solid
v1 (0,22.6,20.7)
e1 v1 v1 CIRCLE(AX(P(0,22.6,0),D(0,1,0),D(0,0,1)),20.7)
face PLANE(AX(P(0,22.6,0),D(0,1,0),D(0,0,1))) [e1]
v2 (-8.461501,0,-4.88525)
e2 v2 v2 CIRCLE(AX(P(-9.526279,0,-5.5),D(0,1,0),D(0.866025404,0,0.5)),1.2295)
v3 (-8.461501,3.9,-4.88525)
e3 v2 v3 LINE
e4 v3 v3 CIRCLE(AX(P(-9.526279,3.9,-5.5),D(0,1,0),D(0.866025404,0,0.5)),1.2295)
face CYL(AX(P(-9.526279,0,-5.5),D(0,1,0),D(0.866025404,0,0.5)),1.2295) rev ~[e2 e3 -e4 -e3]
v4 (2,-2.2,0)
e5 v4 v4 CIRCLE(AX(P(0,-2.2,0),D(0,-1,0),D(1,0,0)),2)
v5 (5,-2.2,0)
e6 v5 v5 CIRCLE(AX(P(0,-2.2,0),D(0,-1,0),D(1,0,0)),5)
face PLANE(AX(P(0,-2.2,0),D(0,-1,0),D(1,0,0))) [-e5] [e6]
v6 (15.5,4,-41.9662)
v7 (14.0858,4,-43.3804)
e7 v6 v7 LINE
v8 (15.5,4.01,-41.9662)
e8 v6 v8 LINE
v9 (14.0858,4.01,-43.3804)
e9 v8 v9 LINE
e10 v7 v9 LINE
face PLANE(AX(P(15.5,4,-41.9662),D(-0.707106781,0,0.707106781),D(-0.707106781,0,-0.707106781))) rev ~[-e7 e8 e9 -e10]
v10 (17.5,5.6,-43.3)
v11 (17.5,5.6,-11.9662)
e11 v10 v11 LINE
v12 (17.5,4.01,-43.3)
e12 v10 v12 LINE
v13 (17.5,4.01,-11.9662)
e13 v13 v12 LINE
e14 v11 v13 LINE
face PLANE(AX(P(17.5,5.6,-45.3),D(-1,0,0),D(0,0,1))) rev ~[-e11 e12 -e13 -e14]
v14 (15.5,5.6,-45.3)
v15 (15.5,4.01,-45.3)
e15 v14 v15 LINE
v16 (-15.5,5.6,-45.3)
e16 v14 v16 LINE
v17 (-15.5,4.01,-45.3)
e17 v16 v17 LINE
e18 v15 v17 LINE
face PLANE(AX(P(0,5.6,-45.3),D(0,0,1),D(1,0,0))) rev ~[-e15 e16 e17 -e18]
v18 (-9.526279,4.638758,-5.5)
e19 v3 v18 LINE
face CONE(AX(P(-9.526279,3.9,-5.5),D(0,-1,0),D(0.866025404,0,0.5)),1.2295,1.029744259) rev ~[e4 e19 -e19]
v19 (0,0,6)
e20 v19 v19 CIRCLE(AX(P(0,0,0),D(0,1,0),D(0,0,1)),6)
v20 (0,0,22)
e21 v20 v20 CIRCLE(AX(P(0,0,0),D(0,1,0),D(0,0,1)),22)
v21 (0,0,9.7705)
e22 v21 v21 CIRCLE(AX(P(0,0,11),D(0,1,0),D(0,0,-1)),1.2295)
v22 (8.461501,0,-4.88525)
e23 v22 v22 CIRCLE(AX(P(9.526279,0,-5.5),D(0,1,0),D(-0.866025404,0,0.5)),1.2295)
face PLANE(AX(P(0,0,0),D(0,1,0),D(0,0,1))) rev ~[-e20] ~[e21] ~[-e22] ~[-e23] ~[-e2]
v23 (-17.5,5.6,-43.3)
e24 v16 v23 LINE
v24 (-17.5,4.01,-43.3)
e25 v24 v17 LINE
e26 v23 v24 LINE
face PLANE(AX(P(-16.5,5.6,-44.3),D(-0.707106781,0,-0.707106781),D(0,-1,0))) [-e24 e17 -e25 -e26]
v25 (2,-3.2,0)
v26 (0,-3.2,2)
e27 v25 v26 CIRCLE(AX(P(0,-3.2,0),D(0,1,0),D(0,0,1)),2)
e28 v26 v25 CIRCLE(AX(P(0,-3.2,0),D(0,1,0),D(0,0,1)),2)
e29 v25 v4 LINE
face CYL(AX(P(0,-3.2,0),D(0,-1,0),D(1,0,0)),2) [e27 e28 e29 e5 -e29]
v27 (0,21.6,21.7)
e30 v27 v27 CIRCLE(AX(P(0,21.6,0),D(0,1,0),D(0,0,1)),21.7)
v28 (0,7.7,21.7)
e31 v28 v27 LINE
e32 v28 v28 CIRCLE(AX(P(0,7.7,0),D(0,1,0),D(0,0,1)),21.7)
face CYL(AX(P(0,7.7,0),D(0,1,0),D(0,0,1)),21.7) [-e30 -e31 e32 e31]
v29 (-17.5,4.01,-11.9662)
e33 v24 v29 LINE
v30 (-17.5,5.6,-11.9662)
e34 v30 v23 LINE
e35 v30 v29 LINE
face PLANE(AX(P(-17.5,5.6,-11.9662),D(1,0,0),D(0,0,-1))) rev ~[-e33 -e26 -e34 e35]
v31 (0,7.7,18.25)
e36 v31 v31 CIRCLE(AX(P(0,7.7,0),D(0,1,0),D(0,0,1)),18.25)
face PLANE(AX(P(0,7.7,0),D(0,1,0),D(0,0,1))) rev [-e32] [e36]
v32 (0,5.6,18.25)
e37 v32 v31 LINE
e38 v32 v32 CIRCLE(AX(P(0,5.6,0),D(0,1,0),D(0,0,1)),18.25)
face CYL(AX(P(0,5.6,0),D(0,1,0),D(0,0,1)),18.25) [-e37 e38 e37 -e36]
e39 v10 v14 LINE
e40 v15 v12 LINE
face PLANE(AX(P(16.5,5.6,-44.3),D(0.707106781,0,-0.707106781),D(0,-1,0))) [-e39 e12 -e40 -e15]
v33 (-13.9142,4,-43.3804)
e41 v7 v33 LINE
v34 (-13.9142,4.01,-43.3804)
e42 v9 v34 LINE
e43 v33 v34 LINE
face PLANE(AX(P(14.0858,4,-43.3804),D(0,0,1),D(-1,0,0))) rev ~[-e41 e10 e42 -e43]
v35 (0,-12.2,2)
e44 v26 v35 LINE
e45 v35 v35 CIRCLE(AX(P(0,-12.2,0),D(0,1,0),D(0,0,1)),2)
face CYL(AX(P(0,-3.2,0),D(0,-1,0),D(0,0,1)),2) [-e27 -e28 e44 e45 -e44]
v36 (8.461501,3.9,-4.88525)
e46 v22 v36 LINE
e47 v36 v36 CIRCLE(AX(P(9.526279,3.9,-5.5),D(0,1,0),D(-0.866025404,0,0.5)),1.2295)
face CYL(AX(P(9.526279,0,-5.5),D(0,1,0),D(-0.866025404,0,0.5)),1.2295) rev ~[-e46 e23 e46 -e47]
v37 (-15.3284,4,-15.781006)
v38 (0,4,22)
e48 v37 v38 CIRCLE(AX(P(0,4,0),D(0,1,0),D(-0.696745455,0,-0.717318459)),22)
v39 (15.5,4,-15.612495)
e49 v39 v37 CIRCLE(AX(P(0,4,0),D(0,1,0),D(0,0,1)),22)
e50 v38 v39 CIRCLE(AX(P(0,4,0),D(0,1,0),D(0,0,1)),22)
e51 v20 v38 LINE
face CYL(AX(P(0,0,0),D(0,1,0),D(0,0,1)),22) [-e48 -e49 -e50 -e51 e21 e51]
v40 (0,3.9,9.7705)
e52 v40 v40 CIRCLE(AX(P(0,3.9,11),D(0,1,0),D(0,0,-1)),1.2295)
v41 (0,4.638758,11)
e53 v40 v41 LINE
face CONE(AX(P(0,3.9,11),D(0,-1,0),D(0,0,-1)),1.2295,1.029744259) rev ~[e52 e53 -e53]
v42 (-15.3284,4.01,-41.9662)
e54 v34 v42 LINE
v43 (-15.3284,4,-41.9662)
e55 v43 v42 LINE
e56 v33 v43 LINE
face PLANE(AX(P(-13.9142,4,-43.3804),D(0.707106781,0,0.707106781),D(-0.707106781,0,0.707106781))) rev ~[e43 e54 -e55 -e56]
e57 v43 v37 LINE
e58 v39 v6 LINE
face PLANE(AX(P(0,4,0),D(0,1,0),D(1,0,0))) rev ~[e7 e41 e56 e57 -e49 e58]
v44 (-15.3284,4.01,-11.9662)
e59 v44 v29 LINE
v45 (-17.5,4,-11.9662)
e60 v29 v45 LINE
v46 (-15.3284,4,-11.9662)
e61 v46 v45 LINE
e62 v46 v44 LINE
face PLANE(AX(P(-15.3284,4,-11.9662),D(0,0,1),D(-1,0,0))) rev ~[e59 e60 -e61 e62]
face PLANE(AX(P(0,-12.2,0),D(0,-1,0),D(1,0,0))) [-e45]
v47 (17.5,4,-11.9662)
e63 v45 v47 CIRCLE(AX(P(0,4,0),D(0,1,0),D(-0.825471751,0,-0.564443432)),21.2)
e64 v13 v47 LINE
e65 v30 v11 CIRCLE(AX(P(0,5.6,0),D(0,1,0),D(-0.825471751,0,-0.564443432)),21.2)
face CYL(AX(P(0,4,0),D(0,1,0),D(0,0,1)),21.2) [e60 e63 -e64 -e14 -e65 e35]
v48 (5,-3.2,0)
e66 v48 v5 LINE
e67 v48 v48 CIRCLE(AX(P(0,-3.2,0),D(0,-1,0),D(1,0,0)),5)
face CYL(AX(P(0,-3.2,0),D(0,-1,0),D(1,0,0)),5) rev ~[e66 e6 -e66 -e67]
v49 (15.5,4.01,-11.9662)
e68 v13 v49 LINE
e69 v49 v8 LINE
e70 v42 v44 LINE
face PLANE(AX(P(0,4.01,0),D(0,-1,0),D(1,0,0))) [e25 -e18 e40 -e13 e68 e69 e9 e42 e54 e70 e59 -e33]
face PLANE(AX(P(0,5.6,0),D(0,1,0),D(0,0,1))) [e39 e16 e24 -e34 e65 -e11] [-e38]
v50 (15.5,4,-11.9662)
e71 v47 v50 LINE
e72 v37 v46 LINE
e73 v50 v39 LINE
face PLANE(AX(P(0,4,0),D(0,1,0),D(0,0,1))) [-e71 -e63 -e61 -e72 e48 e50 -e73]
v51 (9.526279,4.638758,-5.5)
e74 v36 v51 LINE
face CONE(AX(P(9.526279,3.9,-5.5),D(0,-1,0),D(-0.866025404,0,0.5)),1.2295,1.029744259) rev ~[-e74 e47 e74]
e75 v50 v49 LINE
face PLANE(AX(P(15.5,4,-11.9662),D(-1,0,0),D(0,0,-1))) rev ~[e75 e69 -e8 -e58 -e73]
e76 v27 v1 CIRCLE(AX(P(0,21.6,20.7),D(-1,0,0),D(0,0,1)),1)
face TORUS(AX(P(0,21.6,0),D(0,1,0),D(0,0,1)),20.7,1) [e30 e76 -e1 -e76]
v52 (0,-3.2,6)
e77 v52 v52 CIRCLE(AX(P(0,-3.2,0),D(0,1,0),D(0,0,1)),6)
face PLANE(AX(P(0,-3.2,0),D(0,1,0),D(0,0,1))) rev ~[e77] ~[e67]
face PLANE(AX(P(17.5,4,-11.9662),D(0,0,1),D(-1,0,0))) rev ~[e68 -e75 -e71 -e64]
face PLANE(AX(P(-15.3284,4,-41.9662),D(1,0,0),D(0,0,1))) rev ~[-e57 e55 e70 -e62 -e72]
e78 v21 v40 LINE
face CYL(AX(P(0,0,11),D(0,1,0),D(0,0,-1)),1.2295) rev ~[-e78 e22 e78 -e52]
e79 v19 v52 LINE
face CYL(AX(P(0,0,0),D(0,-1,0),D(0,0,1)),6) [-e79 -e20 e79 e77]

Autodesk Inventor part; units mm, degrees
ref_plane "YZ Plane" through (0, 0, 0) normal (1, 0, 0) x (0, 1, 0)
ref_plane "XZ Plane" through (0, 0, 0) normal (0, 1, 0) x (-1, 0, 0)
ref_plane "XY Plane" through (0, 0, 0) normal (0, 0, 1) x (1, 0, 0)
sketch "Skizze1" plane through (0, 0, 0) normal (1, 0, 0) x (0, 1, 0)
  line L0 (0, 26.4) -> (0, -4.4) projected
  line L1 (0, 6) -> (0, 22)
  line L2 (0, 22) -> (4, 22)
  line L3 (4, 22) -> (4, 21.2)
  line L4 (4, 21.2) -> (5.6, 21.2)
  line L5 (5.6, 21.2) -> (5.6, 18.25)
  line L6 (5.6, 18.25) -> (7.7, 18.25)
  line L7 (7.7, 18.25) -> (7.7, 21.7)
  line L8 (7.7, 21.7) -> (22.6, 21.7)
  line L9 (22.6, 21.7) -> (22.6, 0)
  line L10 (-20.2, 0) -> (22.6, 0) construction
  line L11 (0, 6) -> (-3.2, 6)
  line L12 (-3.2, 6) -> (-3.2, 2)
  line L13 (-3.2, 2) -> (-20.2, 2)
  line L14 (-20.2, 2) -> (-20.2, 0)
  line L15 (-28.76, 0) -> (31.16, 0) projected
  line L16 (-20.2, 0) -> (22.6, 0)
  point P0 (0, 0)
  dimension "d0" = 44
  dimension "d1" = 4
  dimension "d2" = 1.6
  dimension "d3" = 2.1
  dimension "d4" = 22.6
  dimension "d5" = 43.4
  dimension "d6" = 12
  dimension "d7" = 4
  dimension "d8" = 3.2
  dimension "d9" = 20.2
  dimension "d10" = 42.4
  dimension "d11" = 36.5
revolve "Umdrehung1" add sketch "Skizze1" angle 360 about axis through (0, -20.2, 0) along (0, 1, 0)
fillet "Rundung1" radius 1 1 edges at (0, 22.6, -21.7)
sketch "Skizze2" plane through (0, -3.2, 0) normal (0, -1, 0) x (1, 0, 0)
  circle A0 centre (0, 0) radius 6 projected
  circle A1 centre (0, 0) radius 5
  circle A2 centre (0, 0) radius 2
  dimension "d14" = 1
extrude "Extrusion1" cut sketch "Skizze2" against normal blind 1 contours A1
sketch "Skizze3" plane through (0, 0, 0) normal (0, -1, 0) x (1, 0, 0)
  line L0 (0, 30.8) -> (0, -30.8) projected
  line L1 (-30.8, 0) -> (30.8, 0) projected
  point P0 (0, 0)
  point P1 (0, 11)
  dimension "d17" = 11
hole "Bohrung1" at (0, 0, 11) direction (0, 1, 0) diameter 2.459 depth 3.9 tip angle 118 thread size "M3x0.5" class "6H" standard "ANSI Metric M Profile"
pattern_circular "Runde Anordnung1" count 3 over 360 about axis through (0, -10, 0) along (0, 1, 0) of "Bohrung1"
sketch "Skizze4" plane through (0, 5.6, 0) normal (0, 1, 0) x (1, 0, 0)
  line L0 (30.8, 0) -> (-30.8, 0) projected
  circle A0 centre (0, 0) radius 21.2 projected
  line L1 (-17.5, 11.9662) -> (-17.5, 45.3)
  line L2 (-17.5, 45.3) -> (17.5, 45.3)
  line L3 (17.5, 45.3) -> (17.5, 11.9662)
  arc A1 (17.5, 11.9662) -> (-17.5, 11.9662) centre (0, 0) ccw
  line L4 (0, 52.3131) -> (0, -34.3855) projected
  dimension "d28" = 35
  dimension "d29" = 45.3
extrude "Extrusion2" add sketch "Skizze4" against normal blind 1.6 contours A0 L4 L2 L3 | A0 L1 L2 L4
chamfer "Fase1" distance 2 angle 45 2 edges at (17.5, 4.8, -45.3) (-17.5, 4.8, -45.3)
sketch "Sketch5" plane through (0, 4, 0) normal (0, -1, 0) x (1, 0, 0)
  line L0 (-17.5, -43.3) -> (-15.5, -45.3) projected
  line L1 (-17.5, -43.3) -> (-17.5, -11.9662) projected
  arc A0 (17.5, -11.9662) -> (-17.5, -11.9662) centre (0, 0) ccw projected
  line L2 (17.5, -11.9662) -> (17.5, -43.3) projected
  line L3 (15.5, -45.3) -> (17.5, -43.3) projected
  line L4 (15.5, -45.3) -> (-15.5, -45.3) projected
  circle A1 centre (0, 0) radius 18.25 projected
  line L5 (17.5, -11.9662) -> (15.5, -11.9662)
  line L6 (15.5, -11.9662) -> (15.5, -41.9662)
  line L7 (15.5, -41.9662) -> (14.0858, -43.3804)
  line L8 (14.0858, -43.3804) -> (-13.9142, -43.3804)
  line L9 (-13.9142, -43.3804) -> (-15.3284, -41.9662)
  line L10 (-15.3284, -41.9662) -> (-15.3284, -11.9662)
  line L11 (-15.3284, -11.9662) -> (-17.5, -11.9662)
  dimension "d35" = 2
  dimension "d36" = 30
  dimension "d37" = 2
  dimension "d38" = 135
  dimension "d39" = 28
  dimension "d40" = 135
  dimension "d41" = 2
  dimension "d42" = 135
extrude "Extrusion3" cut sketch "Sketch5" against normal blind 0.01 contours L1 L11 L10 L9 L8 L7 L6 L5 L2 L3 L4 L0
sketch "Sketch6" plane through (0, -20.2, 0) normal (0, -1, 0) x (1, 0, 0)
  circle A0 centre (0, 0) radius 2 projected
extrude "Extrusion4" cut sketch "Sketch6" against normal blind 8
properties part number "MaxonEC45-50W-MILE" material "Edelstahl"
